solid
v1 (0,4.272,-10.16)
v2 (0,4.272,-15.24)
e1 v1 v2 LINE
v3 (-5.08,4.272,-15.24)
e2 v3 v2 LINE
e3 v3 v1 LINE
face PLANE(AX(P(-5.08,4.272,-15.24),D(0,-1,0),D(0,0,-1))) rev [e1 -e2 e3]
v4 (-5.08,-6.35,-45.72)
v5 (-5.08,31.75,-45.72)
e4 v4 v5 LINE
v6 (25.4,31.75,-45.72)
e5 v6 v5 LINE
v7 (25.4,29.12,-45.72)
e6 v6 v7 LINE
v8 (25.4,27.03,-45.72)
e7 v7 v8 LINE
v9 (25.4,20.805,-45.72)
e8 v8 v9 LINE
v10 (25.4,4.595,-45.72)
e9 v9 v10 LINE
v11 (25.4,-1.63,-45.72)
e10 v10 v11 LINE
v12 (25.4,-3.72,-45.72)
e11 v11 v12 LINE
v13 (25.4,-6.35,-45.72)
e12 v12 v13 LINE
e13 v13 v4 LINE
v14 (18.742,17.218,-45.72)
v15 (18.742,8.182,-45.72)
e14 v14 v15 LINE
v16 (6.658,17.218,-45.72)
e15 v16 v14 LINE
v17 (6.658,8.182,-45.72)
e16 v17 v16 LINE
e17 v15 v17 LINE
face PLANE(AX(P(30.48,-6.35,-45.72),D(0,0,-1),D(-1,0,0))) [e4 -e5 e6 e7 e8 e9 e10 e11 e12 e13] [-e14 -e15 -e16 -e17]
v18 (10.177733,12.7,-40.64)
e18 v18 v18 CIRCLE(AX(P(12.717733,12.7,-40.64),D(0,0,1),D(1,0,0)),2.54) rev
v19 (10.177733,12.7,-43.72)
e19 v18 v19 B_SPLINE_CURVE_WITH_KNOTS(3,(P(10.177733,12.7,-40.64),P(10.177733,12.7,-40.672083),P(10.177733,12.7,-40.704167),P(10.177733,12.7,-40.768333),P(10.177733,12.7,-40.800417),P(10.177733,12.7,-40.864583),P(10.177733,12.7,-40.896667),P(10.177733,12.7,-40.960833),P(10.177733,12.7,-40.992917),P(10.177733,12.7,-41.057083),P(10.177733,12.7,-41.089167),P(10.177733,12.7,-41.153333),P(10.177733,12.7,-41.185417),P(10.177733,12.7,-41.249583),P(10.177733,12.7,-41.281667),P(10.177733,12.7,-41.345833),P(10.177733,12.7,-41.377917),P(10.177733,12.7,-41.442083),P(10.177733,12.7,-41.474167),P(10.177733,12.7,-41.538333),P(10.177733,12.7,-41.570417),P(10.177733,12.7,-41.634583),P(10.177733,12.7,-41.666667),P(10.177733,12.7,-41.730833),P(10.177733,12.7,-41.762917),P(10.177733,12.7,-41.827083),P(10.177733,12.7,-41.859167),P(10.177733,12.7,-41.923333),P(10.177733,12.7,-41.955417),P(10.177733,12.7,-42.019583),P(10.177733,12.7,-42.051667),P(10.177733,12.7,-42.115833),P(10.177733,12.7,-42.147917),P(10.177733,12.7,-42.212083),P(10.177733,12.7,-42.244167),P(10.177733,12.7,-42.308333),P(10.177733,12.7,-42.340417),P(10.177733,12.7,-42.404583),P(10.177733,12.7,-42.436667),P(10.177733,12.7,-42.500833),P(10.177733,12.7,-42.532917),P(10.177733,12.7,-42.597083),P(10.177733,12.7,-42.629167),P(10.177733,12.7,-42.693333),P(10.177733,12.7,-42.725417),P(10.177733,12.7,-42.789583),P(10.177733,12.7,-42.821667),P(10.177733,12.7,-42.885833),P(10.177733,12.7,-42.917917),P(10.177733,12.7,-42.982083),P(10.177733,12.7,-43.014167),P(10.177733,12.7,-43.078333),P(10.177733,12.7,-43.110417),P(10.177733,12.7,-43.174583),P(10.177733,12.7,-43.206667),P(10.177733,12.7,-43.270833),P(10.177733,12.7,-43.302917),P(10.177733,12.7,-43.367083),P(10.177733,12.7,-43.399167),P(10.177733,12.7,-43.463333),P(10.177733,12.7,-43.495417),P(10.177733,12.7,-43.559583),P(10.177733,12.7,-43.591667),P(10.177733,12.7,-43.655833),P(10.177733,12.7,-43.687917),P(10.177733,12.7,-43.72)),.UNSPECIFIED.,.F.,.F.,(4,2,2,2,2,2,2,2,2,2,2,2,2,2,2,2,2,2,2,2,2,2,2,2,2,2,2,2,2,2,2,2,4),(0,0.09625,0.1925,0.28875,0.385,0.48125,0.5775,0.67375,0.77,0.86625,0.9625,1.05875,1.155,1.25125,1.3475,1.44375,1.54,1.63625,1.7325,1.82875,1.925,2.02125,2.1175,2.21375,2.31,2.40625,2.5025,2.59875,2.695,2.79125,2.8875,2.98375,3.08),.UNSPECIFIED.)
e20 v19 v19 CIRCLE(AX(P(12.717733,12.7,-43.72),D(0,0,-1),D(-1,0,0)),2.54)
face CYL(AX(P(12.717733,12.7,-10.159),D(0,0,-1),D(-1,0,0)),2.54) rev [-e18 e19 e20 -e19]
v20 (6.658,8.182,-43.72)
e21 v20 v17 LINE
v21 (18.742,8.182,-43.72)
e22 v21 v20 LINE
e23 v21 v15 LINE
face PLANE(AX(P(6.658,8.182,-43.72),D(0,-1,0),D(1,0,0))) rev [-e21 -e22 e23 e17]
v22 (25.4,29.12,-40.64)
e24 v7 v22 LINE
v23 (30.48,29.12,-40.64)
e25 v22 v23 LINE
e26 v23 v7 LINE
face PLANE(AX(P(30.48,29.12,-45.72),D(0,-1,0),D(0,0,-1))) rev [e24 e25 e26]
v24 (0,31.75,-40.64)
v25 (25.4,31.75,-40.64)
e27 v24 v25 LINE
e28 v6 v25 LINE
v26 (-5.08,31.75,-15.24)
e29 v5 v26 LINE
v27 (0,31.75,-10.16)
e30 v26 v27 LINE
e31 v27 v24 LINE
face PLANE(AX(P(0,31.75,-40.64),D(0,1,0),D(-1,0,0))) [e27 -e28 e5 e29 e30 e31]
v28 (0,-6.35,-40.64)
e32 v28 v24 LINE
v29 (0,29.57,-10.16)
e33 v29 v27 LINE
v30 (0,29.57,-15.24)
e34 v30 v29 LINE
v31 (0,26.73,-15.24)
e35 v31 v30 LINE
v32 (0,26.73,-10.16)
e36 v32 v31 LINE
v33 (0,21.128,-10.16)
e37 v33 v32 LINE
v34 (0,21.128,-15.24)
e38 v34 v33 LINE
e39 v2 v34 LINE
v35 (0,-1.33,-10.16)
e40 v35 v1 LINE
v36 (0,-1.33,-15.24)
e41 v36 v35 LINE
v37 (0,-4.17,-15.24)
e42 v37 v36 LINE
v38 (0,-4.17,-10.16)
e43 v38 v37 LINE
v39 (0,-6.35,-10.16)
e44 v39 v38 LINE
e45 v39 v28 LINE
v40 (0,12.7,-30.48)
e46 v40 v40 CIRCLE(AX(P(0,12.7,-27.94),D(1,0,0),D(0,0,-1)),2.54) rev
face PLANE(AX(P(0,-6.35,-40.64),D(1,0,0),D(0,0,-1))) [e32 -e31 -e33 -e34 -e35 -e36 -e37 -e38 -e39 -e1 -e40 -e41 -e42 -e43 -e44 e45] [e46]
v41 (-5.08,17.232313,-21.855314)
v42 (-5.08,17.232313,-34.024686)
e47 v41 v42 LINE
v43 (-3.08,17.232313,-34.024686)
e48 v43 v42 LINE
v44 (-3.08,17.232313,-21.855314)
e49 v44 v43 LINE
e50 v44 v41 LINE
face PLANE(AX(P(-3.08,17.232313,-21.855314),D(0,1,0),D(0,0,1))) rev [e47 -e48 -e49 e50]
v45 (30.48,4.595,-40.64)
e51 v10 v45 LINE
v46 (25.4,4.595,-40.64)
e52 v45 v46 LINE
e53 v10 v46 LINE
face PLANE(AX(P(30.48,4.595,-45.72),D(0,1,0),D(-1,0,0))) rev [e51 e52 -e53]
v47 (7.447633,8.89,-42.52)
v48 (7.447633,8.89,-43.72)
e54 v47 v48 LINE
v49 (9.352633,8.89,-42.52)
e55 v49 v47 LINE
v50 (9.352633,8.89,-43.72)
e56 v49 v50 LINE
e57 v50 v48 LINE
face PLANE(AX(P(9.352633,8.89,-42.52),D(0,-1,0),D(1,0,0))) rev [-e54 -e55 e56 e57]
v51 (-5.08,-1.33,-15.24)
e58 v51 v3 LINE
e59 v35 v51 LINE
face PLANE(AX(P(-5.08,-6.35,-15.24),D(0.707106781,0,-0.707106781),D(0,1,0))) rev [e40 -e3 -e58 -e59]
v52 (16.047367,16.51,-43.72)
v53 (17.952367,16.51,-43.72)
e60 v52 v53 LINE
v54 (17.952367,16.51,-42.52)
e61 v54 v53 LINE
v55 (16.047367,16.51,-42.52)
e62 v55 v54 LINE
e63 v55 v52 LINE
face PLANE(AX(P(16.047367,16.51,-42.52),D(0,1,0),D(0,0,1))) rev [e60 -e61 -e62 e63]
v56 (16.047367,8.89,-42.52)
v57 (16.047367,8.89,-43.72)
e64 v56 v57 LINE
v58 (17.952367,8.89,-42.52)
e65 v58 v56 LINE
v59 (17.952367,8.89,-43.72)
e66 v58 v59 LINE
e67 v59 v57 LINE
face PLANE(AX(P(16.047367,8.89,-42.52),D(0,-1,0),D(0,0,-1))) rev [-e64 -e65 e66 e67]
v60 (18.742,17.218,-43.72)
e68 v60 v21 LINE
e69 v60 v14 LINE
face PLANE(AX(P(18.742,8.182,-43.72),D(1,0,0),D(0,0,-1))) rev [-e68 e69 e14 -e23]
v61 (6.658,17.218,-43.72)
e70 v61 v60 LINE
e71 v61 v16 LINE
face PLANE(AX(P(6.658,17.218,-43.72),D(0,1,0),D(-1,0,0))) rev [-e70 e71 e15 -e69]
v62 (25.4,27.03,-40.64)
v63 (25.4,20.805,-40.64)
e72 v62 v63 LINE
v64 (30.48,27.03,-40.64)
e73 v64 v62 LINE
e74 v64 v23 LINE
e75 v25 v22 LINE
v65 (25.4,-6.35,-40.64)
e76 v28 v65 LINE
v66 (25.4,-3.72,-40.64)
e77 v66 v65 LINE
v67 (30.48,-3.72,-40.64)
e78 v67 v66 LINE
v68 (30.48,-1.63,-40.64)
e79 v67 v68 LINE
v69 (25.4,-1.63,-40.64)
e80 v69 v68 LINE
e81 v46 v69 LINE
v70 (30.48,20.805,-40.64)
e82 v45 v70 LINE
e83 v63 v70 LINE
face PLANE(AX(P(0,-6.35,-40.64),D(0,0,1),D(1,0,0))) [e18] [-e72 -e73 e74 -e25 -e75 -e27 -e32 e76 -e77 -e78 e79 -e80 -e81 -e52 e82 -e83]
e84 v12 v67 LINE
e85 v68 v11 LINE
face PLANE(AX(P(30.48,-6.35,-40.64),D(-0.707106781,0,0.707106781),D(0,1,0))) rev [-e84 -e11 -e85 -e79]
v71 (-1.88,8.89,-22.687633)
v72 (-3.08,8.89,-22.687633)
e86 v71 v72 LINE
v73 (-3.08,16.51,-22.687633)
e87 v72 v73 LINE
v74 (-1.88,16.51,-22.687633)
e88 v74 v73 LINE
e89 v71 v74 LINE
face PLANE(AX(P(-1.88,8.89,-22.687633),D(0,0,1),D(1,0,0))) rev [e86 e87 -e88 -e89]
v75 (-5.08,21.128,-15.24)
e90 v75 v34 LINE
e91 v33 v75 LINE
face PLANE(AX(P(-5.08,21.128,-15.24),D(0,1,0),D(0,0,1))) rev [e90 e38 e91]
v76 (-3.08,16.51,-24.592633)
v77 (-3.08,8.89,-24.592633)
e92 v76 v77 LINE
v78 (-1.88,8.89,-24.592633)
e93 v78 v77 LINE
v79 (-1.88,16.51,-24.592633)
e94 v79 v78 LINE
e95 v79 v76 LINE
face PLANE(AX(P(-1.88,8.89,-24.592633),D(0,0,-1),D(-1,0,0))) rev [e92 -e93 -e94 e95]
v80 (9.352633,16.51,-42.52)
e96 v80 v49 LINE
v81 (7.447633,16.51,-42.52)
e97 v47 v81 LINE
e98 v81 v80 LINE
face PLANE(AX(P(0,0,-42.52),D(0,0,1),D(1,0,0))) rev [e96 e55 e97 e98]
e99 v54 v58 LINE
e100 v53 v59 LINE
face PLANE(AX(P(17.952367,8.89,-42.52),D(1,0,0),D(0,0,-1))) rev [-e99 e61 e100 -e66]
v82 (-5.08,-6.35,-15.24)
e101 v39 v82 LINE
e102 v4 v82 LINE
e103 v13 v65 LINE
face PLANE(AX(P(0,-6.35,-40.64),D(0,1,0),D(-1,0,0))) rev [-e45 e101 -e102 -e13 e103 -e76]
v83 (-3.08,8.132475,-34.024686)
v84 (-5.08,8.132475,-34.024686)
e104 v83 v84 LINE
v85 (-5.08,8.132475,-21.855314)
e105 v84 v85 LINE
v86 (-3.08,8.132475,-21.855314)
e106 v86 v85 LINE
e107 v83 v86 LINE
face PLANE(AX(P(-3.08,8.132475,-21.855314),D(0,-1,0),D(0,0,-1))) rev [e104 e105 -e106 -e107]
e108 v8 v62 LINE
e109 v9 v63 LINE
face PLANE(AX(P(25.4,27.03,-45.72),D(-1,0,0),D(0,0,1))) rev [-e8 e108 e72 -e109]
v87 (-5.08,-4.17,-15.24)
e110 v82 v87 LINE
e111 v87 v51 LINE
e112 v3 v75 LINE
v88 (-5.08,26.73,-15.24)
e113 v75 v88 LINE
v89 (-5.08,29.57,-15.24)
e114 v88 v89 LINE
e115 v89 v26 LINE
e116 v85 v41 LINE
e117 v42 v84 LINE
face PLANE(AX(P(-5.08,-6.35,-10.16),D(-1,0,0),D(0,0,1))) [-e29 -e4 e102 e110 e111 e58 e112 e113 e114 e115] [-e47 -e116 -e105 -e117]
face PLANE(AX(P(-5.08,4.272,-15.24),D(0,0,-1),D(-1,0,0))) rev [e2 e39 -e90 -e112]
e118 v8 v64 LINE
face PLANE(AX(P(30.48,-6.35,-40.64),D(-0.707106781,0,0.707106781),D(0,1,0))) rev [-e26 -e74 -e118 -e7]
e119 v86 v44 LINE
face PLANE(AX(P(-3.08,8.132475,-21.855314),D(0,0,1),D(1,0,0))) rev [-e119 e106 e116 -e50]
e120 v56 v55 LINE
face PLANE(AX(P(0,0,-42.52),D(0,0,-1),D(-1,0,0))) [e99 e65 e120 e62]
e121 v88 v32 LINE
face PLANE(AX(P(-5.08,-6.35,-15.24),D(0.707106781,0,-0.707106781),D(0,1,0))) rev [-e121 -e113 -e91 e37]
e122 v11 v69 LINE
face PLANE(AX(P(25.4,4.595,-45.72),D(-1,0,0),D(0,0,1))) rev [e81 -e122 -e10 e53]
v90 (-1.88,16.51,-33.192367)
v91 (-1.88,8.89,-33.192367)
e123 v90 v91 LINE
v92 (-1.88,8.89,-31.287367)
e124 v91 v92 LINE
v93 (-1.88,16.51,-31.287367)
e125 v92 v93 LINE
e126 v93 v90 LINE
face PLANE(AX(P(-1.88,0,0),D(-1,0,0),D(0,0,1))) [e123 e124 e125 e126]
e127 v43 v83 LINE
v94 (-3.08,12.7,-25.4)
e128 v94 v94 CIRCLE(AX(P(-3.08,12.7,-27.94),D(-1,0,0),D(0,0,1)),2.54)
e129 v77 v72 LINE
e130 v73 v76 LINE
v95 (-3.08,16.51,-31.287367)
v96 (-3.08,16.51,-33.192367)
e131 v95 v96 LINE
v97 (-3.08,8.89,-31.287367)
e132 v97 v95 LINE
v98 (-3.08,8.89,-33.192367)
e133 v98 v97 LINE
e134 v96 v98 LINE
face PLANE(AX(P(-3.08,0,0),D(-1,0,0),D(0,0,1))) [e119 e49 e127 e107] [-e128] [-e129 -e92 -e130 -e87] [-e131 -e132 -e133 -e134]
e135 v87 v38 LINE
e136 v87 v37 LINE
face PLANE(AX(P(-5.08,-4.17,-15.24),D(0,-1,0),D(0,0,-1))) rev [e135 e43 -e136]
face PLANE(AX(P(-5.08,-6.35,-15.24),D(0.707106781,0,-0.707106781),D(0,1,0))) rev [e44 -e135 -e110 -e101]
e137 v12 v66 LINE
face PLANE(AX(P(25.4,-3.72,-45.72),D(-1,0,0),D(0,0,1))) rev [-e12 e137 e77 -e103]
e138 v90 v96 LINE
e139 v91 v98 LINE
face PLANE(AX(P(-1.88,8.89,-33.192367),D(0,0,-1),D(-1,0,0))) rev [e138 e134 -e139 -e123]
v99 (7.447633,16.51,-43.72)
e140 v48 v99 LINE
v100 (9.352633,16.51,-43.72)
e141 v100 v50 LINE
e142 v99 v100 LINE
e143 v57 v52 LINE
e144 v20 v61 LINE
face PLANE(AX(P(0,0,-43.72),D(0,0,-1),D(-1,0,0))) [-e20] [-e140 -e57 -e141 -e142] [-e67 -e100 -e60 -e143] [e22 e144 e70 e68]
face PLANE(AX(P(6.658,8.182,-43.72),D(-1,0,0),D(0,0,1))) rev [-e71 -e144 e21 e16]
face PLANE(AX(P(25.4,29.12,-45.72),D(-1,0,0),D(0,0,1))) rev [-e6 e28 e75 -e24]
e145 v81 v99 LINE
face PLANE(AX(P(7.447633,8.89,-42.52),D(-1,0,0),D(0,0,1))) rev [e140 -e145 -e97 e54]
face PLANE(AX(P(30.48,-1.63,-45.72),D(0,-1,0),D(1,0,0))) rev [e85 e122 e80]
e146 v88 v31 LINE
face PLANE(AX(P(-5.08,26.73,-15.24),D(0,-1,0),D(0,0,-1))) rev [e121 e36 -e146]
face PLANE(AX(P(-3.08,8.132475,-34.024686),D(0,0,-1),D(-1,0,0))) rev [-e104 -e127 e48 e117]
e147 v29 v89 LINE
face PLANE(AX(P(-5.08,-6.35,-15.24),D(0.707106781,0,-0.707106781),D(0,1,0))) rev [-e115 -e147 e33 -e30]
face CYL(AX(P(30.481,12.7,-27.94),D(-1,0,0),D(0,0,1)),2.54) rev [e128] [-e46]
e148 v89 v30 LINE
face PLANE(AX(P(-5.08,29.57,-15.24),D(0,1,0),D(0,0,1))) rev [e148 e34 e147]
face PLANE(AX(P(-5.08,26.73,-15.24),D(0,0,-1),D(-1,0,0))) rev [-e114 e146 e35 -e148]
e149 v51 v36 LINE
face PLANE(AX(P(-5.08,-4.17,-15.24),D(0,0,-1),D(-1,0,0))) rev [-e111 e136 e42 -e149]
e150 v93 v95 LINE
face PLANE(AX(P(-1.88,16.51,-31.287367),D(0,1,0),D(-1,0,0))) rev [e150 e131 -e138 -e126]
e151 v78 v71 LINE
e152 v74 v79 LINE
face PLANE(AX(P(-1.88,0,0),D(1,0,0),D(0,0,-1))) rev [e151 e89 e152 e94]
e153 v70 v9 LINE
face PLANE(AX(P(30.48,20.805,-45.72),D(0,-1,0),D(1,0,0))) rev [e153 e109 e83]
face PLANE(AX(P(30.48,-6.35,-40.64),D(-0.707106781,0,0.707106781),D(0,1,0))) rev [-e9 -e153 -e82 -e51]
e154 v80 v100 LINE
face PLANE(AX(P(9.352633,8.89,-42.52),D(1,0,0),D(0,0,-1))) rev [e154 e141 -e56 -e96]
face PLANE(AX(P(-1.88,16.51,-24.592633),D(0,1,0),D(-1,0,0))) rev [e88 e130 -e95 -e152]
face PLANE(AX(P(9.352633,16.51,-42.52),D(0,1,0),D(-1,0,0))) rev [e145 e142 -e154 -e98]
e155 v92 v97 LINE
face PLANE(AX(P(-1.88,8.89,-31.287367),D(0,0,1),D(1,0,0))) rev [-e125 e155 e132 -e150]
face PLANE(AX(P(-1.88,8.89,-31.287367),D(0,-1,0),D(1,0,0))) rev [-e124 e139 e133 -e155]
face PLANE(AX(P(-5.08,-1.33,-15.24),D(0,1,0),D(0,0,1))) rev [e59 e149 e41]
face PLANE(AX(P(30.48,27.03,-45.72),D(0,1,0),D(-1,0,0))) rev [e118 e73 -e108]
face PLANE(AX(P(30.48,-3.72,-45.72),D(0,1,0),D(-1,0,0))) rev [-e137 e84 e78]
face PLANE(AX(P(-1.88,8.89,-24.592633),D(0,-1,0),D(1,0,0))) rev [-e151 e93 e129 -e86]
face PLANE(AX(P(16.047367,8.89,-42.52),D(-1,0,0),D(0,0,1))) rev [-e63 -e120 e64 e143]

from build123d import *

# Parameters (mm, degrees)
BOSS_EXTRUDE1_DEPTH      = 31.75
BOSS_EXTRUDE1_DEPTH_BACK = 6.35
BODY_MOVE_COPY1_ANGLE    = 90
SKETCH24_W               = 5.08
SKETCH24_H               = 2.84
SKETCH24_H_2             = 16.856
SKETCH24_H_3             = 2.839999908
CUT_EXTRUDE4_DEPTH       = 64.461888563
SKETCH26_W               = 5.08
SKETCH26_H               = 6.225000088
SKETCH26_H_2             = 2.629999912
CUT_EXTRUDE5_DEPTH       = 54.536186827
CHAMFER1_SIZE            = 5.08
CHAMFER2_SIZE            = 5.08
SKETCH29_W               = 12.0839992
SKETCH29_H               = 9.0359992
CUT_EXTRUDE6_DEPTH       = 2
SKETCH28_W               = 12.16937175
SKETCH28_H               = 9.099837858
CUT_EXTRUDE7_DEPTH       = 2
CUT_EXTRUDE8_REACH       = 66.997
SKETCH38_R               = 2.54
CUT_EXTRUDE10_REACH      = 57.348
SKETCH40_R               = 2.54
SKETCH41_W               = 1.905
SKETCH41_H               = 7.62
CUT_EXTRUDE11_DEPTH      = 1.2
SKETCH42_W               = 1.905
SKETCH42_H               = 7.62
CUT_EXTRUDE12_DEPTH      = 1.2


with BuildPart() as part:
    # Sketch1 → Boss-Extrude1 (new, two sides: drawn at the far end of the back side and taken through both)
    with BuildSketch(Plane(origin=(0, 0, 0), x_dir=(1, 0, 0), z_dir=(0, 1, 0)).offset(-BOSS_EXTRUDE1_DEPTH_BACK)):
        Polygon((0, 0), (30.48, 0), (30.48, -5.08), (-5.08, -5.08), (-5.08, 30.48), (0, 30.48), align=None)
    extrude(amount=BOSS_EXTRUDE1_DEPTH + BOSS_EXTRUDE1_DEPTH_BACK)


with BuildPart() as part_1:
    # Body-Move/Copy1: moved
    add(part.part.rotate(Axis((-5.08, 0, 5.08), (0, -1, 0)), BODY_MOVE_COPY1_ANGLE))


with BuildPart() as part_2:
    # Body-Move/Copy2: moved
    add(part_1.part.moved(Location((0, 0, -25.4))))


with BuildPart() as part_3:
    # Body-Move/Copy3: moved
    add(part_2.part.moved(Location((0, 0, -25.4))))

    # Sketch24 → Cut-Extrude4 (cut, through all)
    with BuildSketch(Plane(origin=(0, 0, 0), x_dir=(0, 0, -1), z_dir=(1, 0, 0))):
        with Locations((12.7, 28.15)):
            Rectangle(SKETCH24_W, SKETCH24_H)
        with Locations((12.7, 12.7)):
            Rectangle(SKETCH24_W, SKETCH24_H_2)
        with Locations((12.7, -2.75)):
            Rectangle(SKETCH24_W, SKETCH24_H_3)
    extrude(amount=-CUT_EXTRUDE4_DEPTH, mode=Mode.SUBTRACT)

    # Sketch26 → Cut-Extrude5 (cut, through all)
    with BuildSketch(Plane.XY.offset(-40.64)):
        with Locations((27.94, 23.9175)):
            Rectangle(SKETCH26_W, SKETCH26_H)
        with Locations((27.94, 30.435000044)):
            Rectangle(SKETCH26_W, SKETCH26_H_2)
        with Locations((27.94, 1.4825)):
            Rectangle(SKETCH26_W, SKETCH26_H)
        with Locations((27.94, -5.035000044)):
            Rectangle(SKETCH26_W, SKETCH26_H_2)
    extrude(amount=-CUT_EXTRUDE5_DEPTH, mode=Mode.SUBTRACT)

    # Chamfer1
    chamfer1_edges = [part_3.edges().sort_by_distance(p)[0] for p in [
        (-5.08, -5.259999977, -10.16),
        (-5.08, 1.470999977, -10.16),
        (-5.08, 23.929, -10.16),
        (-5.08, 30.66, -10.16),
    ]]
    chamfer(chamfer1_edges, length=CHAMFER1_SIZE - 0.0001)  # a hair under: the kernel refuses the full size

    # Chamfer2
    chamfer2_edges = [part_3.edges().sort_by_distance(p)[0] for p in [
        (30.48, -2.675000066, -45.72),
        (30.48, 12.7, -45.72),
        (30.48, 28.075000066, -45.72),
    ]]
    chamfer(chamfer2_edges, length=CHAMFER2_SIZE - 0.0001)  # a hair under: the kernel refuses the full size

    # Sketch29 → Cut-Extrude6 (cut)
    with BuildSketch(Plane(origin=(0, 0, -45.72), x_dir=(-1, 0, 0), z_dir=(0, 0, -1))):
        with Locations((-12.7, 12.7)):
            Rectangle(SKETCH29_W, SKETCH29_H)
    extrude(amount=-CUT_EXTRUDE6_DEPTH, mode=Mode.SUBTRACT)

    # Sketch28 → Cut-Extrude7 (cut)
    with BuildSketch(Plane.ZY.offset(5.08)):
        with Locations((-27.94, 12.682393608)):
            Rectangle(SKETCH28_W, SKETCH28_H)
    extrude(amount=-CUT_EXTRUDE7_DEPTH, mode=Mode.SUBTRACT)

    # Sketch38 → Cut-Extrude8 (cut, up to next)
    with BuildSketch(Plane.ZY.offset(3.08), mode=Mode.PRIVATE) as cut_extrude8_sk1:
        with Locations((-27.94, 12.7)):
            Circle(SKETCH38_R)
    cut_extrude8_tool1 = extrude(cut_extrude8_sk1.sketch, amount=-CUT_EXTRUDE8_REACH, mode=Mode.PRIVATE) & part_3.part
    add(cut_extrude8_tool1.solids().sort_by_distance((-3.08, 12.7, -27.94))[0], mode=Mode.SUBTRACT)

    # Sketch40 → Cut-Extrude10 (cut, up to next)
    with BuildSketch(Plane(origin=(0, 0, -43.72), x_dir=(-1, 0, 0), z_dir=(0, 0, -1)), mode=Mode.PRIVATE) as cut_extrude10_sk1:
        with Locations((-12.717733491, 12.7)):
            Circle(SKETCH40_R)
    cut_extrude10_tool1 = extrude(cut_extrude10_sk1.sketch, amount=-CUT_EXTRUDE10_REACH, mode=Mode.PRIVATE) & part_3.part
    add(cut_extrude10_tool1.solids().sort_by_distance((12.717733, 12.7, -43.72))[0], mode=Mode.SUBTRACT)

    # Sketch41 → Cut-Extrude11 (cut)
    with BuildSketch(Plane(origin=(0, 0, -43.72), x_dir=(-1, 0, 0), z_dir=(0, 0, -1))):
        with Locations((-8.400133455, 12.7)):
            Rectangle(SKETCH41_W, SKETCH41_H)
        with Locations((-16.999866545, 12.7)):
            Rectangle(SKETCH41_W, SKETCH41_H)
    extrude(amount=-CUT_EXTRUDE11_DEPTH, mode=Mode.SUBTRACT)

    # Sketch42 → Cut-Extrude12 (cut)
    with BuildSketch(Plane.ZY.offset(3.08)):
        with Locations((-23.640133455, 12.7)):
            Rectangle(SKETCH42_W, SKETCH42_H)
        with Locations((-32.239866545, 12.7)):
            Rectangle(SKETCH42_W, SKETCH42_H)
    extrude(amount=-CUT_EXTRUDE12_DEPTH, mode=Mode.SUBTRACT)


solid = part_3.part
